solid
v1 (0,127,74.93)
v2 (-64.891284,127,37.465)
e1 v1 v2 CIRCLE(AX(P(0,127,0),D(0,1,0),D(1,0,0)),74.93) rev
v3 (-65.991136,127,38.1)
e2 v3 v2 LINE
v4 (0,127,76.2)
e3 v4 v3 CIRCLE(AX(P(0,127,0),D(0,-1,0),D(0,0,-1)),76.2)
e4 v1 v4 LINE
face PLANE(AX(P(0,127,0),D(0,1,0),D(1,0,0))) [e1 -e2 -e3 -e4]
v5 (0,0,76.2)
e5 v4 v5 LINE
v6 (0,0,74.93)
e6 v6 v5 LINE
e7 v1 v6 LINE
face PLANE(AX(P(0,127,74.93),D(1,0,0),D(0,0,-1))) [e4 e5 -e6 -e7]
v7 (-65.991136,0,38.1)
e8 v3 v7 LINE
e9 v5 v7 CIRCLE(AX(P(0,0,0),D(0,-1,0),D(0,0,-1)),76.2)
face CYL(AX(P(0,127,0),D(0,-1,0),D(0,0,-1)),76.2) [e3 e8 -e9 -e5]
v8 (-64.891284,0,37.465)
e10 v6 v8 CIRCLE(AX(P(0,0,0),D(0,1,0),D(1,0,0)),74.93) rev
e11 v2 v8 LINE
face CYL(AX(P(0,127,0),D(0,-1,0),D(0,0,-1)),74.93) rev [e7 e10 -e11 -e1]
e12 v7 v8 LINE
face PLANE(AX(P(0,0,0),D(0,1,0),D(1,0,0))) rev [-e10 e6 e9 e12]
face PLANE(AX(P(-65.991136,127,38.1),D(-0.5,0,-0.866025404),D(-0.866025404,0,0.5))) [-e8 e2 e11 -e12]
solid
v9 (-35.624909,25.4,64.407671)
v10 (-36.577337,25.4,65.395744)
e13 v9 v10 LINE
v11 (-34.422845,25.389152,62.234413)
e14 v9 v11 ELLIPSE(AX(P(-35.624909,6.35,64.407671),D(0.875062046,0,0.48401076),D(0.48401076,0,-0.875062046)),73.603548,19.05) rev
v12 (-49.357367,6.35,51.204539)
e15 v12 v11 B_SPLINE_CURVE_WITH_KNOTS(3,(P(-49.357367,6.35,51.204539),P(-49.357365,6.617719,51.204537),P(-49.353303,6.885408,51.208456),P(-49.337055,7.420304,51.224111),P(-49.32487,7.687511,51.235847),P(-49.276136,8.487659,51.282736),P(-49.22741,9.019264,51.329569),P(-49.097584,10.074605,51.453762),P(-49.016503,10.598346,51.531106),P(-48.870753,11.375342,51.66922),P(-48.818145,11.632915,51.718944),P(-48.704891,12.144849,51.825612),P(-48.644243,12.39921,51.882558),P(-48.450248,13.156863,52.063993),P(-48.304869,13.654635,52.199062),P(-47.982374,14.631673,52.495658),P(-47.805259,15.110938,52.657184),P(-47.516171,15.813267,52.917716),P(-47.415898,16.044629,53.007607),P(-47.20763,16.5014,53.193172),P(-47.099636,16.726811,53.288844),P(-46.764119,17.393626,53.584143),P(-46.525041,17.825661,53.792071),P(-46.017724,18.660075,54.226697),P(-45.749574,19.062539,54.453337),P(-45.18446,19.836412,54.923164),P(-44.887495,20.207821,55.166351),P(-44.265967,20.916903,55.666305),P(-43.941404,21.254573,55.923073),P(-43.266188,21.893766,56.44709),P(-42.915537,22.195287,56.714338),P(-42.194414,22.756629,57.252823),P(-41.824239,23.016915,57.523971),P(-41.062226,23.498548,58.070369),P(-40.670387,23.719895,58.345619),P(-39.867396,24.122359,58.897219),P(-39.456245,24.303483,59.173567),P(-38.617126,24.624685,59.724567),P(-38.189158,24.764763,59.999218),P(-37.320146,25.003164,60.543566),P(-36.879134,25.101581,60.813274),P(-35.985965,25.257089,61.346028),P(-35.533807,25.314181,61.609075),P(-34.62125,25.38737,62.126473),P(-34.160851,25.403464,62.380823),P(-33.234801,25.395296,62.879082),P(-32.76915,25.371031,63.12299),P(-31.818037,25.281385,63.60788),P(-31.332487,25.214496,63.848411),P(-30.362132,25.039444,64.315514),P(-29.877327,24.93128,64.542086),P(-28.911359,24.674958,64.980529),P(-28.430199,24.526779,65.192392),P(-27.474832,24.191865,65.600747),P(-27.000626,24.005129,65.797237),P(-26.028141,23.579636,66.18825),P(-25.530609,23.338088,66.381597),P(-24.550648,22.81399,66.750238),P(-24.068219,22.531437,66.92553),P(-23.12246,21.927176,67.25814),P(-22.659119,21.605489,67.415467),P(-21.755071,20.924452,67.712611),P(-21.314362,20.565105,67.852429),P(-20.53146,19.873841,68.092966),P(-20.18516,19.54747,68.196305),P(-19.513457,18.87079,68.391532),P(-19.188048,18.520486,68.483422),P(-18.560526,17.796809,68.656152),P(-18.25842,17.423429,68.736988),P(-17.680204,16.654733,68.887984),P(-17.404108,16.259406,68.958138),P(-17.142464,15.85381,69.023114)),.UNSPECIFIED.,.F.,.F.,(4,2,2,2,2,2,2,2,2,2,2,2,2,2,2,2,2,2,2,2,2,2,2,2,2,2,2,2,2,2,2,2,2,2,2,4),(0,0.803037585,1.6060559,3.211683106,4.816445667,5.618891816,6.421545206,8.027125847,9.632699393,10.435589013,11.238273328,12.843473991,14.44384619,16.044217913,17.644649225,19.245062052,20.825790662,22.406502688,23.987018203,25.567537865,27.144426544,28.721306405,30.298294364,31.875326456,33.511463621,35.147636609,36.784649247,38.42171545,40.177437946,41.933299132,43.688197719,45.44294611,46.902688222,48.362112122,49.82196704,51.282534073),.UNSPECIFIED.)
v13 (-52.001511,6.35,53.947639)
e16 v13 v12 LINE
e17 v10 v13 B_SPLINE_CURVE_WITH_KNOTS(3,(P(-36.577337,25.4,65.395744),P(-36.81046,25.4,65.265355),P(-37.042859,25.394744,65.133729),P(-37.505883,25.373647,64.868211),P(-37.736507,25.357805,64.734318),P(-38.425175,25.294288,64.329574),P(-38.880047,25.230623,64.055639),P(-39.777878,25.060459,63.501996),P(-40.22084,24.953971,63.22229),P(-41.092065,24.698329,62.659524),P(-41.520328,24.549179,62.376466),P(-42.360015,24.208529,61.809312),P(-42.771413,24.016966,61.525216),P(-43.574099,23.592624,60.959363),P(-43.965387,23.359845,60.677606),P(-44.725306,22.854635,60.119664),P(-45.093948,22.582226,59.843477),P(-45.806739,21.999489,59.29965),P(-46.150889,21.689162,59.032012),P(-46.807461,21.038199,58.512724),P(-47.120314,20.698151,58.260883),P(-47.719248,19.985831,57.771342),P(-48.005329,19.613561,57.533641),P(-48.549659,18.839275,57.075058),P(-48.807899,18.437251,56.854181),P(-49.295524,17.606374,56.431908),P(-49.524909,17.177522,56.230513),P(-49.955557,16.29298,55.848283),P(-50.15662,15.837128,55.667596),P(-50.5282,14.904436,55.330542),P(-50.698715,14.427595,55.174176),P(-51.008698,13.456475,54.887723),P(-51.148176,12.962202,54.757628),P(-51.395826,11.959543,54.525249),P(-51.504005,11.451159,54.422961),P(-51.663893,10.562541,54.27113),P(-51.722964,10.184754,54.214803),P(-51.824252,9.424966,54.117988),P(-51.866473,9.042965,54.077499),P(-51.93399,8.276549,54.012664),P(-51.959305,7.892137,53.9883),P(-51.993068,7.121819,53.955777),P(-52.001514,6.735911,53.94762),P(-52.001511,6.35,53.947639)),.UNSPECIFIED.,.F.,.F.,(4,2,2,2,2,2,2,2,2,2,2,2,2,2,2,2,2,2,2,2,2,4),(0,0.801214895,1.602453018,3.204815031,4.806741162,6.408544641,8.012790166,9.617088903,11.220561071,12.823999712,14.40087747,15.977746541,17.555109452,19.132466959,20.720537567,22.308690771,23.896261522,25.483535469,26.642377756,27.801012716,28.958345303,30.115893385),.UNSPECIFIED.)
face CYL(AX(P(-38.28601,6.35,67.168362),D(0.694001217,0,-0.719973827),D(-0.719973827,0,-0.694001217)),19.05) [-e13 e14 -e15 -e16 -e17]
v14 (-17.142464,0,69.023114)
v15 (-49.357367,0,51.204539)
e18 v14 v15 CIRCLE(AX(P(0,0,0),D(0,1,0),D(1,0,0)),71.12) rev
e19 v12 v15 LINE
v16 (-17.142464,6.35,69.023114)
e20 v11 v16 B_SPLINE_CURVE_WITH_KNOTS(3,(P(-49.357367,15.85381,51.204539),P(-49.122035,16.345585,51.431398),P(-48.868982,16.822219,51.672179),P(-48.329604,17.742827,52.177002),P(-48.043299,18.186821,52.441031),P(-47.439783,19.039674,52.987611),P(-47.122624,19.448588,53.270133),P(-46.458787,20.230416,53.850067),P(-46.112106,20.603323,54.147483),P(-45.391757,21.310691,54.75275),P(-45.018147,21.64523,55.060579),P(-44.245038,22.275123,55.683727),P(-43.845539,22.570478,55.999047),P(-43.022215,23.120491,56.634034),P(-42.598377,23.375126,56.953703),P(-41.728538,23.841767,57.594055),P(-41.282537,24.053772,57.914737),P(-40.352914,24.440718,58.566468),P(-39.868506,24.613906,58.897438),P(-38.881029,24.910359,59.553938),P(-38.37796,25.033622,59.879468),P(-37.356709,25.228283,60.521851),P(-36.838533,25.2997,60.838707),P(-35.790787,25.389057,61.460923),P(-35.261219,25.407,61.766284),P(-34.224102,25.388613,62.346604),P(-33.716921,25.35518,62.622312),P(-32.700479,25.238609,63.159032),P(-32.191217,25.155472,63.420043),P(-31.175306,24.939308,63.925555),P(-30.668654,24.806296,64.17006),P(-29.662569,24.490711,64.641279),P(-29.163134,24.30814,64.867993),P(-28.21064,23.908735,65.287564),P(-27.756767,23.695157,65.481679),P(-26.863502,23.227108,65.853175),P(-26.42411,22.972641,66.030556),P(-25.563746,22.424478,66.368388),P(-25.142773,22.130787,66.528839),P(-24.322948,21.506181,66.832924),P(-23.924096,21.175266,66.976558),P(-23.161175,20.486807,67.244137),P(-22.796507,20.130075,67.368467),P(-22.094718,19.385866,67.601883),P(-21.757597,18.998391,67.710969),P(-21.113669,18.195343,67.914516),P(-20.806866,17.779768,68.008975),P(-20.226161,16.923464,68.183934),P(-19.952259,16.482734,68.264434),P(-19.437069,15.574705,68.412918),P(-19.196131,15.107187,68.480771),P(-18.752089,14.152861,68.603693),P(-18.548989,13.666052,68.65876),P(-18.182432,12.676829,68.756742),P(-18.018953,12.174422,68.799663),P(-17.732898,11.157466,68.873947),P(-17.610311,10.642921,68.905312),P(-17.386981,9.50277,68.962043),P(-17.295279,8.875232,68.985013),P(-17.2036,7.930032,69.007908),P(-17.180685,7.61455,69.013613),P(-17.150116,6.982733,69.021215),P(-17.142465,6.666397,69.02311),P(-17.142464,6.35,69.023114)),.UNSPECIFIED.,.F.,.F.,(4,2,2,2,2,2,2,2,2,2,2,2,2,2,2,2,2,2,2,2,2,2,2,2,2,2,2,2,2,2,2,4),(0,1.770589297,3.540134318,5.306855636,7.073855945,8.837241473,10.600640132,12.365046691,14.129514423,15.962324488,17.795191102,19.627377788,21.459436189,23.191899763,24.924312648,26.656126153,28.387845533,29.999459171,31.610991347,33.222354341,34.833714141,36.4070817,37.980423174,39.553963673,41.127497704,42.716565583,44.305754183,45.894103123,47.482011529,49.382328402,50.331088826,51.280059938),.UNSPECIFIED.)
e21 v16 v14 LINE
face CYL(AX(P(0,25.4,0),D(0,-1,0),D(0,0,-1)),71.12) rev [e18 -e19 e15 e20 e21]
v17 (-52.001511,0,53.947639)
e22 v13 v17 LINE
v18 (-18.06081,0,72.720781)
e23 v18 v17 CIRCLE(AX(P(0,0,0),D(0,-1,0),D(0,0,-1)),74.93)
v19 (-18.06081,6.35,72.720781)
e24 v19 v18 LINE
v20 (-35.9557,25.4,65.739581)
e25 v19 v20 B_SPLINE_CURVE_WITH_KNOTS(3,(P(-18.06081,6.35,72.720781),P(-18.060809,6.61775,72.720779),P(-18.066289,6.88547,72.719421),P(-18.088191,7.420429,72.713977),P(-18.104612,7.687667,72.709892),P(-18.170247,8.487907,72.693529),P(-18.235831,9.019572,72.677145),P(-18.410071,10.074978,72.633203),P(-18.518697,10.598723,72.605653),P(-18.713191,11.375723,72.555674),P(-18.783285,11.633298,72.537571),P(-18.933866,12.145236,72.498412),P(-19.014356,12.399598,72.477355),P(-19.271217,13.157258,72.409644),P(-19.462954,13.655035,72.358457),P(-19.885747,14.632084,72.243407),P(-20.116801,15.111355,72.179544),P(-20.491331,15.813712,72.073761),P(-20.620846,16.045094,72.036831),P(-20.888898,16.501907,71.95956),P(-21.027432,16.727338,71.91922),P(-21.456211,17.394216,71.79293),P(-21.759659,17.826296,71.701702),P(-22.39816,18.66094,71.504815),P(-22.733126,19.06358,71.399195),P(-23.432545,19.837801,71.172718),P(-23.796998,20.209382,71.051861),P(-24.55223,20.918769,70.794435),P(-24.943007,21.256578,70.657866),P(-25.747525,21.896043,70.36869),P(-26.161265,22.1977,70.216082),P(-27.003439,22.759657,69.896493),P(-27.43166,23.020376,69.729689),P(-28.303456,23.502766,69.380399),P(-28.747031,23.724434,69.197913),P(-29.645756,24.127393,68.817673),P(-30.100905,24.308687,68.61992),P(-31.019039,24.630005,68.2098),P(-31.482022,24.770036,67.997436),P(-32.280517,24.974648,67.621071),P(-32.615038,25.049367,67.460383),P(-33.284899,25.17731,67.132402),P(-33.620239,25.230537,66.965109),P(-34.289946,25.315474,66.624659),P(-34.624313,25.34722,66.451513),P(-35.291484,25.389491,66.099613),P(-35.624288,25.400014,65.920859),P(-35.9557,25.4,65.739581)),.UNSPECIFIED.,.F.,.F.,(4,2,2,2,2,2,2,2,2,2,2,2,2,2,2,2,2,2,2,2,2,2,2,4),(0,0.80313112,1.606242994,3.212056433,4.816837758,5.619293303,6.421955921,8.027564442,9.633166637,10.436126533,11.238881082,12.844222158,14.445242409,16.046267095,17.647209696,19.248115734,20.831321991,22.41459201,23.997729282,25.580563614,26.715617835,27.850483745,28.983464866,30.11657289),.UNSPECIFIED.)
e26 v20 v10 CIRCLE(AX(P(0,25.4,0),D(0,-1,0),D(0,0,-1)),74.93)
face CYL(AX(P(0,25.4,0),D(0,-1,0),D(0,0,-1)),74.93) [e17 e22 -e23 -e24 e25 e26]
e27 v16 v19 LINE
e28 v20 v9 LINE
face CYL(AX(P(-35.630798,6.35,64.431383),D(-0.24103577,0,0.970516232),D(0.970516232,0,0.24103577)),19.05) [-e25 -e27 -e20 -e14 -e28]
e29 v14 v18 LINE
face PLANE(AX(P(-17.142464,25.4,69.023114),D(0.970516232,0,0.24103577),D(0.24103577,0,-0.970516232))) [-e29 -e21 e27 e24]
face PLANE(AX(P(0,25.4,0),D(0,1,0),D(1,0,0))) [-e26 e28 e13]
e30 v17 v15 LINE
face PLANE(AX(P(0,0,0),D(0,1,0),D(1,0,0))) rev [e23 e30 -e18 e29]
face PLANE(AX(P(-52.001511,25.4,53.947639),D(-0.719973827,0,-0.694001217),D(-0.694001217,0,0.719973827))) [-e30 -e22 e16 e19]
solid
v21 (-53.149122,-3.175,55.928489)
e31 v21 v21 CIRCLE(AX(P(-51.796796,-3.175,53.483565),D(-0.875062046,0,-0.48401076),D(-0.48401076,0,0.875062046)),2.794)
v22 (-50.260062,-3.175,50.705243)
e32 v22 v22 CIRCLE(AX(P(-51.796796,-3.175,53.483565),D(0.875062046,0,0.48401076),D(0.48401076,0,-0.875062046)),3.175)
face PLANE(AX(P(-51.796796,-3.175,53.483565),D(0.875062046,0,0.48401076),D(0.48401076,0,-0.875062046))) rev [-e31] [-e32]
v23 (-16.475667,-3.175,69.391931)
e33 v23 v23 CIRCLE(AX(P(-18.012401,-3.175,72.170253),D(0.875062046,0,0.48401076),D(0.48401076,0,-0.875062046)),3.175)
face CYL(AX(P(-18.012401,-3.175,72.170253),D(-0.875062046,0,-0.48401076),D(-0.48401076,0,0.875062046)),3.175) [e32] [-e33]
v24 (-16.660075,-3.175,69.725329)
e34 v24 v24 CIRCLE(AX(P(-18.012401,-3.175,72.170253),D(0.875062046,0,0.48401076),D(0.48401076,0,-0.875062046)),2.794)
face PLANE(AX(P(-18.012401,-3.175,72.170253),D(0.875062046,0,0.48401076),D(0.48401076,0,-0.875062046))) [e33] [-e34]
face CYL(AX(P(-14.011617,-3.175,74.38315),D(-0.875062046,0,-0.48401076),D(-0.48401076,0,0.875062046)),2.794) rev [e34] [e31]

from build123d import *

# Parameters (mm, degrees)
EXTRUDE_THIN1_DEPTH      = 127
EXTRUDE_THIN2_DEPTH      = 25.4
FILLET1_R                = 19.05
BOSS_EXTRUDE3_DEPTH      = 0.762
BOSS_EXTRUDE3_DEPTH_BACK = 37.846
SKETCH11_R               = 3.175
SKETCH13_R               = 2.794
CUT_EXTRUDE1_DEPTH       = 43.18


with BuildPart() as part:
    # Sketch1 → Extrude-Thin1 (new body)
    with BuildSketch(Plane(origin=(0, 0, 0), x_dir=(1, 0, 0), z_dir=(0, 1, 0))):
        with BuildLine():
            ThreePointArc((0, -76.2), (-38.1, -65.991135768), (-65.991135768, -38.1))
            Line((-65.991135768, -38.1), (-64.891283506, -37.465))
            ThreePointArc((-64.891283506, -37.465), (-37.465, -64.891283506), (0, -74.93))
            Line((0, -74.93), (0, -76.2))
        make_face()
    extrude(amount=EXTRUDE_THIN1_DEPTH)


with BuildPart() as body_2:
    # Sketch8 → Extrude-Thin2 (new body)
    with BuildSketch(Plane(origin=(0, 0, 0), x_dir=(1, 0, 0), z_dir=(0, 1, 0))):
        with BuildLine():
            ThreePointArc((-18.060810272, -72.720781296), (-36.26692626, -65.568399093), (-52.001511157, -53.947638849))
            Line((-52.001511157, -53.947638849), (-49.357366522, -51.204538569))
            ThreePointArc((-49.357366522, -51.204538569), (-34.422845264, -62.234412699), (-17.142463987, -69.02311445))
            Line((-17.142463987, -69.02311445), (-18.060810272, -72.720781296))
        make_face()
    extrude(amount=EXTRUDE_THIN2_DEPTH)

    # Fillet1
    # the kernel refuses this fillet: 19.05 mm, written as the material it takes off along each edge
    with BuildSketch(Plane(origin=(-85.053319095, 25.4, 88.236392355), x_dir=(0, -1, 0), z_dir=(0.694001216558829, 0, -0.7199738268957181)), Plane(origin=(-5.663135424, 25.4, 22.802278881), x_dir=(0, -1, 0), z_dir=(-0.24103577034940327, 0, 0.9705162324310036))) as fillet1_piece_1:
        with BuildLine():
            CenterArc((FILLET1_R, -FILLET1_R), FILLET1_R, 90, 90)
            Line((0, -FILLET1_R), (0, 0))
            Line((0, 0), (FILLET1_R, 0))
        make_face()
    extrude(amount=99.06, mode=Mode.SUBTRACT)


with BuildPart() as body_3:
    # Sketch11 → Boss-Extrude3 (new, two sides: drawn at the far end of the back side and taken through both)
    with BuildSketch(Plane(origin=(16.107451267, 0, 8.909287941), x_dir=(0.48401076017425226, 0, -0.8750620458204906), z_dir=(0.8750620458204906, 0, 0.48401076017425226)).offset(-BOSS_EXTRUDE3_DEPTH_BACK)):
        with Locations((-71.871644766, -3.175)):
            Circle(SKETCH11_R)
    extrude(amount=BOSS_EXTRUDE3_DEPTH + BOSS_EXTRUDE3_DEPTH_BACK)

    # Sketch13 → Cut-Extrude1 (cut)
    with BuildSketch(Plane(origin=(-17.010146919, 0, -9.408583289), x_dir=(-0.48401076017425226, 0, 0.8750620458204906), z_dir=(-0.8750620458204907, 0, -0.4840107601742523))):
        with Locations((71.871644766, -3.175)):
            Circle(SKETCH13_R)
    extrude(amount=-CUT_EXTRUDE1_DEPTH, mode=Mode.SUBTRACT)


solid = Compound([part.part, body_2.part, body_3.part])
